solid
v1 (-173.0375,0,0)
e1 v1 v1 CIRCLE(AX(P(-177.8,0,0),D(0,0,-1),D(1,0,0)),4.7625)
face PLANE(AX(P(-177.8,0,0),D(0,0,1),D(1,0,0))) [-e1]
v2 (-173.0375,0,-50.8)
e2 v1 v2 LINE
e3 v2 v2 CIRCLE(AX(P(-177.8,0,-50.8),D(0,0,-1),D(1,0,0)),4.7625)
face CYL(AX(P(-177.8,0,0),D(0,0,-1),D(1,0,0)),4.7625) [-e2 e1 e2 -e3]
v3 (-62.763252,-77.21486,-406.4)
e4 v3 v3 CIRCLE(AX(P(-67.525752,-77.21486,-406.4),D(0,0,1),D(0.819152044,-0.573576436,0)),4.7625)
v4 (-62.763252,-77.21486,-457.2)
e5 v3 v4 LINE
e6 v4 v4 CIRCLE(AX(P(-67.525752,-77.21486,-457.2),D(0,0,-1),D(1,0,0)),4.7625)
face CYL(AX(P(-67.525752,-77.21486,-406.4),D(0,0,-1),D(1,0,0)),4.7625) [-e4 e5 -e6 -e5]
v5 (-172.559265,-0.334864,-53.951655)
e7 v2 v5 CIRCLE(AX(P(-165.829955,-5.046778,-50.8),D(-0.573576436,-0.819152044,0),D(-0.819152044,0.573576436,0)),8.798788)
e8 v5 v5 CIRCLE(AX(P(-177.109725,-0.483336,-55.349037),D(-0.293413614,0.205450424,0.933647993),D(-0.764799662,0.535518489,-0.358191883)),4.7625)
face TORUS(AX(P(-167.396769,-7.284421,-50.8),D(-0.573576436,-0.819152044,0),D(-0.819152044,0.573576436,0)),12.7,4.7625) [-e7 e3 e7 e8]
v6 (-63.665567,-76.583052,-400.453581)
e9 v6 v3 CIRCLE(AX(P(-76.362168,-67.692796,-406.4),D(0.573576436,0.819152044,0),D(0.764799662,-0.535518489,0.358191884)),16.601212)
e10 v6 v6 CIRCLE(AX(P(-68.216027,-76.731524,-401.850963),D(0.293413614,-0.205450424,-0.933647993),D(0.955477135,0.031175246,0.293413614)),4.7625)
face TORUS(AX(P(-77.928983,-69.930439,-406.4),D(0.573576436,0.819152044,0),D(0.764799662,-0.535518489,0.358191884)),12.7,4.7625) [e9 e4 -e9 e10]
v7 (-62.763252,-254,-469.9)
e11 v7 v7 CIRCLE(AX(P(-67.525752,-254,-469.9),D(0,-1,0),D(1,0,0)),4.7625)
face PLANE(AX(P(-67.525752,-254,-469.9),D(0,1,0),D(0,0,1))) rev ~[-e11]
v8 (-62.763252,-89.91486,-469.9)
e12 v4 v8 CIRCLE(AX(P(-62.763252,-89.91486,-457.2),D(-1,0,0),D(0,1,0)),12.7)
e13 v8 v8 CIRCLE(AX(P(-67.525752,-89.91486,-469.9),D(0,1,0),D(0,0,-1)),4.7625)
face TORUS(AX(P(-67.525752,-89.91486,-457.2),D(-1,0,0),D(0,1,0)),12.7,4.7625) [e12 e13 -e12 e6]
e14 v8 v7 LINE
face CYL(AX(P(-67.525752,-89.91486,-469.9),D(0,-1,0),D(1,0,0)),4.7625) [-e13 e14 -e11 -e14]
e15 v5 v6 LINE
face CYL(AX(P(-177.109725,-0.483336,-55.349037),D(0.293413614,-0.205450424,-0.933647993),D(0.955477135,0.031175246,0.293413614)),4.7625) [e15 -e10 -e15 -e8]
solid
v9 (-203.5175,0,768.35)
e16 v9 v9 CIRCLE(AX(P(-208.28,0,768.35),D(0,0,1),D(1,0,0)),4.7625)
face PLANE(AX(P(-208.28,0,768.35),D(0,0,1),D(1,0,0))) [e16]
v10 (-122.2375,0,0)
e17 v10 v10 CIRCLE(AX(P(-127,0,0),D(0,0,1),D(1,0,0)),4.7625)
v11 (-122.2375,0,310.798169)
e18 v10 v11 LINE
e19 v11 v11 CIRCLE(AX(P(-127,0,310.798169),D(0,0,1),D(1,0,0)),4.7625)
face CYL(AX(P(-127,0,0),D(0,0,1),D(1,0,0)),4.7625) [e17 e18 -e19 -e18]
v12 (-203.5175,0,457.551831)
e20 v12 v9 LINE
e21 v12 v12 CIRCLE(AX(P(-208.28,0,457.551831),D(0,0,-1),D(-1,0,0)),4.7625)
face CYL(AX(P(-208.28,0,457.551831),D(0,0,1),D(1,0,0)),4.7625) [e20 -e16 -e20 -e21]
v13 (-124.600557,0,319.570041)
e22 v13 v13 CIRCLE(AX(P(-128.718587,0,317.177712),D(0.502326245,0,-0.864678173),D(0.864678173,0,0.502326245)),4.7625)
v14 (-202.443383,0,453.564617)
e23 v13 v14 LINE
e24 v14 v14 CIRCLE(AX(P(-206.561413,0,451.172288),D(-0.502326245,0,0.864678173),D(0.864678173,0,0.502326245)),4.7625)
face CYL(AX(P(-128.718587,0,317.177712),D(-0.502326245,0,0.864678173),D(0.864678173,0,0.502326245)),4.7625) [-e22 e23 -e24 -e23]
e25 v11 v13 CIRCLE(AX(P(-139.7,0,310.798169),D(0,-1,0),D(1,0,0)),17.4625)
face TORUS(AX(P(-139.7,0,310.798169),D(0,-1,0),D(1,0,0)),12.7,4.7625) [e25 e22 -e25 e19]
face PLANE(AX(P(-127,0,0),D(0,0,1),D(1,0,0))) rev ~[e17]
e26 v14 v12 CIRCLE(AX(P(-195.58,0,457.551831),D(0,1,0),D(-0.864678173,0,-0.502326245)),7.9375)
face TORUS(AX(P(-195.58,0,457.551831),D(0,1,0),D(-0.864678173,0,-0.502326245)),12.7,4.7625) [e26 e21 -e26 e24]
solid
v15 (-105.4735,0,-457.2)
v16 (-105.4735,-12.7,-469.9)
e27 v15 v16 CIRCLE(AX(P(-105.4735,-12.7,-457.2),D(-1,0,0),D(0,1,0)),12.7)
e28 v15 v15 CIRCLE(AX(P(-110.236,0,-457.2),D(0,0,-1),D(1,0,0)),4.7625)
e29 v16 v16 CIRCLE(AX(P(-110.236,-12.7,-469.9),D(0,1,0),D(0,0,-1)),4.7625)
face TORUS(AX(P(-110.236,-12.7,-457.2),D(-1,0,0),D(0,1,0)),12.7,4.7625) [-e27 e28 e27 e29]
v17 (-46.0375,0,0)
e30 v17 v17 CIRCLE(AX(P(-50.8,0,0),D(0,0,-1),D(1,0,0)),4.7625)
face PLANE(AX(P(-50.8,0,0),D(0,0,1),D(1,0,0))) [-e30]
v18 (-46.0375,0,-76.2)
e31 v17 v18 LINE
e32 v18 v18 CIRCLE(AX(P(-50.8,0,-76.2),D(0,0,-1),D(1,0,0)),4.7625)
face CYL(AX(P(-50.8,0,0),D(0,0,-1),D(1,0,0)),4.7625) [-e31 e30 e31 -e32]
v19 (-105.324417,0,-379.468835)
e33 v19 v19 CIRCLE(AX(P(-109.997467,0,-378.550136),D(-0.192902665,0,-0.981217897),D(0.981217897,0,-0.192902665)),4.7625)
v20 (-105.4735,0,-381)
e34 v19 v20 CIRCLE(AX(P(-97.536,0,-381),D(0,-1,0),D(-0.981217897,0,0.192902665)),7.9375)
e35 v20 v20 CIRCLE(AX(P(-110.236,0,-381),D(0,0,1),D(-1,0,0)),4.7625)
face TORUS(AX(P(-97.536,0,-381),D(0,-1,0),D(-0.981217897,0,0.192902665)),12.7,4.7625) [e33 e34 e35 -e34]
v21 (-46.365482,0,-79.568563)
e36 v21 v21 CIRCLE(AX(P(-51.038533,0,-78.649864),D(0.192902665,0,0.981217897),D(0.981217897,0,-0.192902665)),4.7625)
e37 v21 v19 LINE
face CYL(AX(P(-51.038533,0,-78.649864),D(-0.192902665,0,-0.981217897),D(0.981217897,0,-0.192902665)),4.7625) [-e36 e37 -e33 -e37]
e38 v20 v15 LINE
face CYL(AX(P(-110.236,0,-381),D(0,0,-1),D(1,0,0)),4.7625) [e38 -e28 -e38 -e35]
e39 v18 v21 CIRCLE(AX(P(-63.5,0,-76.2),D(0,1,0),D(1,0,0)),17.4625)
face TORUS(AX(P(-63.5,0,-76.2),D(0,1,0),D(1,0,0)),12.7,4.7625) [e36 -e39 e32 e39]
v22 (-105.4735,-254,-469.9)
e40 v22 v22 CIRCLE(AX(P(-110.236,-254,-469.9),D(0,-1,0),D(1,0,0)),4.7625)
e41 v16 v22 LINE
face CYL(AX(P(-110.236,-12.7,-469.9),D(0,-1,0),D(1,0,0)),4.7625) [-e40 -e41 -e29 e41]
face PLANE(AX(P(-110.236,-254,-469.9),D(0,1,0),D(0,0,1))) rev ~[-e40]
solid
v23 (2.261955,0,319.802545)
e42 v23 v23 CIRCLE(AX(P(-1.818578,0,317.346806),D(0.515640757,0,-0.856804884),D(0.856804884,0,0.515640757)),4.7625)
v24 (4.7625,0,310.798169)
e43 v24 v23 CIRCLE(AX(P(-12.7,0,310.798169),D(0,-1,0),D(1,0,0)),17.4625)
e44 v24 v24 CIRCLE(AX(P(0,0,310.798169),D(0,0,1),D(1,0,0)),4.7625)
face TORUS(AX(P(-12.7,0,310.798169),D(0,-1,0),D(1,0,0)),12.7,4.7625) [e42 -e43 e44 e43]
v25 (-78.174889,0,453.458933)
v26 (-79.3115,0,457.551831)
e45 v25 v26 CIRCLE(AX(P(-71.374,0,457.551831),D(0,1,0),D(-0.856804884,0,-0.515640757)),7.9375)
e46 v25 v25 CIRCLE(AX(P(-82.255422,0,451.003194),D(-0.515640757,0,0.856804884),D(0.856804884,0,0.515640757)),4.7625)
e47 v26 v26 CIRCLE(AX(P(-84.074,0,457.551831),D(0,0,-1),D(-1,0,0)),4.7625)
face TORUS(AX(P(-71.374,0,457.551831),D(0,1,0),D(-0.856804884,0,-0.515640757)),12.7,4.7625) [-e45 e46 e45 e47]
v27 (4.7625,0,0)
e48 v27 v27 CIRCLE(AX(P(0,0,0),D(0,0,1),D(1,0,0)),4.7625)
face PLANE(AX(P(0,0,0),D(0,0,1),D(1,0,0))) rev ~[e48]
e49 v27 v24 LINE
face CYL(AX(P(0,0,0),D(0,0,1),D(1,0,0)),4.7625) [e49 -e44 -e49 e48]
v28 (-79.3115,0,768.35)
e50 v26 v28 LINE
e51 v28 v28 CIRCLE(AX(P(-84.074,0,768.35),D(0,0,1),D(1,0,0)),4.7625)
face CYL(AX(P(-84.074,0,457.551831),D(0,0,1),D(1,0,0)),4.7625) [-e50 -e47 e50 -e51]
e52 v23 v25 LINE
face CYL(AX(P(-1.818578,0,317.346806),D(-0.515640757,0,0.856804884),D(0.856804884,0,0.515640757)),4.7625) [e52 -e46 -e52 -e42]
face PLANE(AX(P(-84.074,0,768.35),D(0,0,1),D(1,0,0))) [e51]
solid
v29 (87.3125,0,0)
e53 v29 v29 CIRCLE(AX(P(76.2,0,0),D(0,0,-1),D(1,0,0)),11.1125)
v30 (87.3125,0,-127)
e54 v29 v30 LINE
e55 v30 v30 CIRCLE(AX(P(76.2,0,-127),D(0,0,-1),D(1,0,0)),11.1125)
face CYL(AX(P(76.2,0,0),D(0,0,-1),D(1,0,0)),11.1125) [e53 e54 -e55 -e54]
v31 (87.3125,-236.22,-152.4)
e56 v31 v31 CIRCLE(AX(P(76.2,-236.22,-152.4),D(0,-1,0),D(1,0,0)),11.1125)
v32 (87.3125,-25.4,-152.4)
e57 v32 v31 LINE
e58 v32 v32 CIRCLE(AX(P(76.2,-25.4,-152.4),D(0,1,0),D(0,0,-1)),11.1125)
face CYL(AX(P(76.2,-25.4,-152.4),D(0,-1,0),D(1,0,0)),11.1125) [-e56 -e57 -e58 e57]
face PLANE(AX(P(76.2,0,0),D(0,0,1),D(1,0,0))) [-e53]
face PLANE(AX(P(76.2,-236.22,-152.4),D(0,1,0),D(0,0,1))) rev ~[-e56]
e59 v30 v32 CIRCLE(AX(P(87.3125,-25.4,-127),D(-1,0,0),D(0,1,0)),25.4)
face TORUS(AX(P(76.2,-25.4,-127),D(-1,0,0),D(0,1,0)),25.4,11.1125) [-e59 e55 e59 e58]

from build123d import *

# Parameters (mm, degrees)
F0_R   = 4.7625
F0_R_2 = 11.1125


# Not quite as in the source:
# - a feature names something its author has since deleted; it is built from what else it names


with BuildPart() as f2:
    # F2: sweep along a path in F1
    with BuildLine(Plane.XZ) as f2_path:
        Line((0, 0), (0, 310.7981686801))
        ThreePointArc((0, 310.7981686801), (-0.4630874045, 314.1963991211), (-1.8185779732, 317.3468062999))
        Line((-1.8185779732, 317.3468062999), (-82.2554220268, 451.0031937001))
        ThreePointArc((-82.2554220268, 451.0031937001), (-83.6109125955, 454.1536008789), (-84.074, 457.5518313199))
        Line((-84.074, 457.5518313199), (-84.074, 768.35))
    # F0 (on Top) → F2 (sweep)
    with BuildSketch(Plane.XY):
        Circle(F0_R)
    sweep(path=f2_path.line)


with BuildPart() as f3:
    # F3: sweep along a path in F1
    with BuildLine(Plane.XZ) as f3_path:
        Line((-127, 0), (-127, 310.7981686801))
        ThreePointArc((-127, 310.7981686801), (-127.4371711548, 314.1016560366), (-128.7185871991, 317.1777119942))
        Line((-128.7185871991, 317.1777119942), (-206.5614128009, 451.1722880058))
        ThreePointArc((-206.5614128009, 451.1722880058), (-207.8428288452, 454.2483439634), (-208.28, 457.5518313199))
        Line((-208.28, 457.5518313199), (-208.28, 768.35))
    # F0 (on Top) → F3 (sweep)
    with BuildSketch(Plane.XY):
        with Locations((-127, 0)):
            Circle(F0_R)
    sweep(path=f3_path.line)


with BuildPart() as f7:
    # F7: sweep along a path in F6
    with BuildLine(Plane.YZ.offset(76.2)) as f7_path:
        Line((0, 0), (0, -127))
        ThreePointArc((0, -127), (-7.4394877579, -144.9605122421), (-25.4, -152.4))
        Line((-25.4, -152.4), (-236.22, -152.4))
    # F0 (on Top) → F7 (sweep)
    with BuildSketch(Plane.XY):
        with Locations((76.2, 0)):
            Circle(F0_R_2)
    sweep(path=f7_path.line)


with BuildPart() as f9:
    # F9: sweep along a path in F1, F8
    with BuildLine(Plane.XZ) as f9_path:
        Line((-50.8, 0), (-50.8, -76.2))
        ThreePointArc((-50.8, -76.2), (-50.8597738423, -77.4307244538), (-51.0385327057, -78.6498638479))
        Line((-51.0385327057, -78.6498638479), (-109.9974672943, -378.5501361521))
        ThreePointArc((-109.9974672943, -378.5501361521), (-110.1762261577, -379.7692755462), (-110.236, -381))
        Line((-110.236, -381), (-110.236, -457.2))
    with BuildLine(Plane.YZ.offset(-110.236)) as f9_path_2:
        ThreePointArc((0, -457.2), (-3.7197438789, -466.1802561211), (-12.7, -469.9))
        Line((-12.7, -469.9), (-254, -469.9))
    # F0 (on Top) → F9 (sweep)
    with BuildSketch(Plane.XY):
        with Locations((-50.8, 0)):
            Circle(F0_R)
    sweep(path=f9_path.line + f9_path_2.line)


with BuildPart() as f14:
    # F14: sweep along a path in F11, F13
    with BuildLine(Plane(origin=(-58.4944092583, -83.5386739879, 0), x_dir=(-0.8191520443, 0.5735764364, 0), z_dir=(0.5735764364, 0.8191520443, 0))) as f14_path:
        Line((145.6452334746, 0), (145.6452334746, -50.8))
        ThreePointArc((145.6452334746, -50.8), (145.4327889753, -53.1132136986), (144.802562984, -55.3490369207))
        Line((144.802562984, -55.3490369207), (11.8679039652, -401.8509630793))
        ThreePointArc((11.8679039652, -401.8509630793), (11.2376779738, -404.0867863014), (11.0252334746, -406.4))
        Line((11.0252334746, -406.4), (11.0252334746, -457.2))
    with BuildLine(Plane.YZ.offset(-67.5257517978)) as f14_path_2:
        ThreePointArc((-77.2148598616, -457.2), (-80.9346037405, -466.1802561211), (-89.9148598616, -469.9))
        Line((-89.9148598616, -469.9), (-254, -469.9))
    # F0 (on Top) → F14 (sweep)
    with BuildSketch(Plane.XY):
        with Locations((-177.8, 0)):
            Circle(F0_R)
    sweep(path=f14_path.line + f14_path_2.line)


solid = Compound([f2.part, f3.part, f7.part, f9.part, f14.part])
